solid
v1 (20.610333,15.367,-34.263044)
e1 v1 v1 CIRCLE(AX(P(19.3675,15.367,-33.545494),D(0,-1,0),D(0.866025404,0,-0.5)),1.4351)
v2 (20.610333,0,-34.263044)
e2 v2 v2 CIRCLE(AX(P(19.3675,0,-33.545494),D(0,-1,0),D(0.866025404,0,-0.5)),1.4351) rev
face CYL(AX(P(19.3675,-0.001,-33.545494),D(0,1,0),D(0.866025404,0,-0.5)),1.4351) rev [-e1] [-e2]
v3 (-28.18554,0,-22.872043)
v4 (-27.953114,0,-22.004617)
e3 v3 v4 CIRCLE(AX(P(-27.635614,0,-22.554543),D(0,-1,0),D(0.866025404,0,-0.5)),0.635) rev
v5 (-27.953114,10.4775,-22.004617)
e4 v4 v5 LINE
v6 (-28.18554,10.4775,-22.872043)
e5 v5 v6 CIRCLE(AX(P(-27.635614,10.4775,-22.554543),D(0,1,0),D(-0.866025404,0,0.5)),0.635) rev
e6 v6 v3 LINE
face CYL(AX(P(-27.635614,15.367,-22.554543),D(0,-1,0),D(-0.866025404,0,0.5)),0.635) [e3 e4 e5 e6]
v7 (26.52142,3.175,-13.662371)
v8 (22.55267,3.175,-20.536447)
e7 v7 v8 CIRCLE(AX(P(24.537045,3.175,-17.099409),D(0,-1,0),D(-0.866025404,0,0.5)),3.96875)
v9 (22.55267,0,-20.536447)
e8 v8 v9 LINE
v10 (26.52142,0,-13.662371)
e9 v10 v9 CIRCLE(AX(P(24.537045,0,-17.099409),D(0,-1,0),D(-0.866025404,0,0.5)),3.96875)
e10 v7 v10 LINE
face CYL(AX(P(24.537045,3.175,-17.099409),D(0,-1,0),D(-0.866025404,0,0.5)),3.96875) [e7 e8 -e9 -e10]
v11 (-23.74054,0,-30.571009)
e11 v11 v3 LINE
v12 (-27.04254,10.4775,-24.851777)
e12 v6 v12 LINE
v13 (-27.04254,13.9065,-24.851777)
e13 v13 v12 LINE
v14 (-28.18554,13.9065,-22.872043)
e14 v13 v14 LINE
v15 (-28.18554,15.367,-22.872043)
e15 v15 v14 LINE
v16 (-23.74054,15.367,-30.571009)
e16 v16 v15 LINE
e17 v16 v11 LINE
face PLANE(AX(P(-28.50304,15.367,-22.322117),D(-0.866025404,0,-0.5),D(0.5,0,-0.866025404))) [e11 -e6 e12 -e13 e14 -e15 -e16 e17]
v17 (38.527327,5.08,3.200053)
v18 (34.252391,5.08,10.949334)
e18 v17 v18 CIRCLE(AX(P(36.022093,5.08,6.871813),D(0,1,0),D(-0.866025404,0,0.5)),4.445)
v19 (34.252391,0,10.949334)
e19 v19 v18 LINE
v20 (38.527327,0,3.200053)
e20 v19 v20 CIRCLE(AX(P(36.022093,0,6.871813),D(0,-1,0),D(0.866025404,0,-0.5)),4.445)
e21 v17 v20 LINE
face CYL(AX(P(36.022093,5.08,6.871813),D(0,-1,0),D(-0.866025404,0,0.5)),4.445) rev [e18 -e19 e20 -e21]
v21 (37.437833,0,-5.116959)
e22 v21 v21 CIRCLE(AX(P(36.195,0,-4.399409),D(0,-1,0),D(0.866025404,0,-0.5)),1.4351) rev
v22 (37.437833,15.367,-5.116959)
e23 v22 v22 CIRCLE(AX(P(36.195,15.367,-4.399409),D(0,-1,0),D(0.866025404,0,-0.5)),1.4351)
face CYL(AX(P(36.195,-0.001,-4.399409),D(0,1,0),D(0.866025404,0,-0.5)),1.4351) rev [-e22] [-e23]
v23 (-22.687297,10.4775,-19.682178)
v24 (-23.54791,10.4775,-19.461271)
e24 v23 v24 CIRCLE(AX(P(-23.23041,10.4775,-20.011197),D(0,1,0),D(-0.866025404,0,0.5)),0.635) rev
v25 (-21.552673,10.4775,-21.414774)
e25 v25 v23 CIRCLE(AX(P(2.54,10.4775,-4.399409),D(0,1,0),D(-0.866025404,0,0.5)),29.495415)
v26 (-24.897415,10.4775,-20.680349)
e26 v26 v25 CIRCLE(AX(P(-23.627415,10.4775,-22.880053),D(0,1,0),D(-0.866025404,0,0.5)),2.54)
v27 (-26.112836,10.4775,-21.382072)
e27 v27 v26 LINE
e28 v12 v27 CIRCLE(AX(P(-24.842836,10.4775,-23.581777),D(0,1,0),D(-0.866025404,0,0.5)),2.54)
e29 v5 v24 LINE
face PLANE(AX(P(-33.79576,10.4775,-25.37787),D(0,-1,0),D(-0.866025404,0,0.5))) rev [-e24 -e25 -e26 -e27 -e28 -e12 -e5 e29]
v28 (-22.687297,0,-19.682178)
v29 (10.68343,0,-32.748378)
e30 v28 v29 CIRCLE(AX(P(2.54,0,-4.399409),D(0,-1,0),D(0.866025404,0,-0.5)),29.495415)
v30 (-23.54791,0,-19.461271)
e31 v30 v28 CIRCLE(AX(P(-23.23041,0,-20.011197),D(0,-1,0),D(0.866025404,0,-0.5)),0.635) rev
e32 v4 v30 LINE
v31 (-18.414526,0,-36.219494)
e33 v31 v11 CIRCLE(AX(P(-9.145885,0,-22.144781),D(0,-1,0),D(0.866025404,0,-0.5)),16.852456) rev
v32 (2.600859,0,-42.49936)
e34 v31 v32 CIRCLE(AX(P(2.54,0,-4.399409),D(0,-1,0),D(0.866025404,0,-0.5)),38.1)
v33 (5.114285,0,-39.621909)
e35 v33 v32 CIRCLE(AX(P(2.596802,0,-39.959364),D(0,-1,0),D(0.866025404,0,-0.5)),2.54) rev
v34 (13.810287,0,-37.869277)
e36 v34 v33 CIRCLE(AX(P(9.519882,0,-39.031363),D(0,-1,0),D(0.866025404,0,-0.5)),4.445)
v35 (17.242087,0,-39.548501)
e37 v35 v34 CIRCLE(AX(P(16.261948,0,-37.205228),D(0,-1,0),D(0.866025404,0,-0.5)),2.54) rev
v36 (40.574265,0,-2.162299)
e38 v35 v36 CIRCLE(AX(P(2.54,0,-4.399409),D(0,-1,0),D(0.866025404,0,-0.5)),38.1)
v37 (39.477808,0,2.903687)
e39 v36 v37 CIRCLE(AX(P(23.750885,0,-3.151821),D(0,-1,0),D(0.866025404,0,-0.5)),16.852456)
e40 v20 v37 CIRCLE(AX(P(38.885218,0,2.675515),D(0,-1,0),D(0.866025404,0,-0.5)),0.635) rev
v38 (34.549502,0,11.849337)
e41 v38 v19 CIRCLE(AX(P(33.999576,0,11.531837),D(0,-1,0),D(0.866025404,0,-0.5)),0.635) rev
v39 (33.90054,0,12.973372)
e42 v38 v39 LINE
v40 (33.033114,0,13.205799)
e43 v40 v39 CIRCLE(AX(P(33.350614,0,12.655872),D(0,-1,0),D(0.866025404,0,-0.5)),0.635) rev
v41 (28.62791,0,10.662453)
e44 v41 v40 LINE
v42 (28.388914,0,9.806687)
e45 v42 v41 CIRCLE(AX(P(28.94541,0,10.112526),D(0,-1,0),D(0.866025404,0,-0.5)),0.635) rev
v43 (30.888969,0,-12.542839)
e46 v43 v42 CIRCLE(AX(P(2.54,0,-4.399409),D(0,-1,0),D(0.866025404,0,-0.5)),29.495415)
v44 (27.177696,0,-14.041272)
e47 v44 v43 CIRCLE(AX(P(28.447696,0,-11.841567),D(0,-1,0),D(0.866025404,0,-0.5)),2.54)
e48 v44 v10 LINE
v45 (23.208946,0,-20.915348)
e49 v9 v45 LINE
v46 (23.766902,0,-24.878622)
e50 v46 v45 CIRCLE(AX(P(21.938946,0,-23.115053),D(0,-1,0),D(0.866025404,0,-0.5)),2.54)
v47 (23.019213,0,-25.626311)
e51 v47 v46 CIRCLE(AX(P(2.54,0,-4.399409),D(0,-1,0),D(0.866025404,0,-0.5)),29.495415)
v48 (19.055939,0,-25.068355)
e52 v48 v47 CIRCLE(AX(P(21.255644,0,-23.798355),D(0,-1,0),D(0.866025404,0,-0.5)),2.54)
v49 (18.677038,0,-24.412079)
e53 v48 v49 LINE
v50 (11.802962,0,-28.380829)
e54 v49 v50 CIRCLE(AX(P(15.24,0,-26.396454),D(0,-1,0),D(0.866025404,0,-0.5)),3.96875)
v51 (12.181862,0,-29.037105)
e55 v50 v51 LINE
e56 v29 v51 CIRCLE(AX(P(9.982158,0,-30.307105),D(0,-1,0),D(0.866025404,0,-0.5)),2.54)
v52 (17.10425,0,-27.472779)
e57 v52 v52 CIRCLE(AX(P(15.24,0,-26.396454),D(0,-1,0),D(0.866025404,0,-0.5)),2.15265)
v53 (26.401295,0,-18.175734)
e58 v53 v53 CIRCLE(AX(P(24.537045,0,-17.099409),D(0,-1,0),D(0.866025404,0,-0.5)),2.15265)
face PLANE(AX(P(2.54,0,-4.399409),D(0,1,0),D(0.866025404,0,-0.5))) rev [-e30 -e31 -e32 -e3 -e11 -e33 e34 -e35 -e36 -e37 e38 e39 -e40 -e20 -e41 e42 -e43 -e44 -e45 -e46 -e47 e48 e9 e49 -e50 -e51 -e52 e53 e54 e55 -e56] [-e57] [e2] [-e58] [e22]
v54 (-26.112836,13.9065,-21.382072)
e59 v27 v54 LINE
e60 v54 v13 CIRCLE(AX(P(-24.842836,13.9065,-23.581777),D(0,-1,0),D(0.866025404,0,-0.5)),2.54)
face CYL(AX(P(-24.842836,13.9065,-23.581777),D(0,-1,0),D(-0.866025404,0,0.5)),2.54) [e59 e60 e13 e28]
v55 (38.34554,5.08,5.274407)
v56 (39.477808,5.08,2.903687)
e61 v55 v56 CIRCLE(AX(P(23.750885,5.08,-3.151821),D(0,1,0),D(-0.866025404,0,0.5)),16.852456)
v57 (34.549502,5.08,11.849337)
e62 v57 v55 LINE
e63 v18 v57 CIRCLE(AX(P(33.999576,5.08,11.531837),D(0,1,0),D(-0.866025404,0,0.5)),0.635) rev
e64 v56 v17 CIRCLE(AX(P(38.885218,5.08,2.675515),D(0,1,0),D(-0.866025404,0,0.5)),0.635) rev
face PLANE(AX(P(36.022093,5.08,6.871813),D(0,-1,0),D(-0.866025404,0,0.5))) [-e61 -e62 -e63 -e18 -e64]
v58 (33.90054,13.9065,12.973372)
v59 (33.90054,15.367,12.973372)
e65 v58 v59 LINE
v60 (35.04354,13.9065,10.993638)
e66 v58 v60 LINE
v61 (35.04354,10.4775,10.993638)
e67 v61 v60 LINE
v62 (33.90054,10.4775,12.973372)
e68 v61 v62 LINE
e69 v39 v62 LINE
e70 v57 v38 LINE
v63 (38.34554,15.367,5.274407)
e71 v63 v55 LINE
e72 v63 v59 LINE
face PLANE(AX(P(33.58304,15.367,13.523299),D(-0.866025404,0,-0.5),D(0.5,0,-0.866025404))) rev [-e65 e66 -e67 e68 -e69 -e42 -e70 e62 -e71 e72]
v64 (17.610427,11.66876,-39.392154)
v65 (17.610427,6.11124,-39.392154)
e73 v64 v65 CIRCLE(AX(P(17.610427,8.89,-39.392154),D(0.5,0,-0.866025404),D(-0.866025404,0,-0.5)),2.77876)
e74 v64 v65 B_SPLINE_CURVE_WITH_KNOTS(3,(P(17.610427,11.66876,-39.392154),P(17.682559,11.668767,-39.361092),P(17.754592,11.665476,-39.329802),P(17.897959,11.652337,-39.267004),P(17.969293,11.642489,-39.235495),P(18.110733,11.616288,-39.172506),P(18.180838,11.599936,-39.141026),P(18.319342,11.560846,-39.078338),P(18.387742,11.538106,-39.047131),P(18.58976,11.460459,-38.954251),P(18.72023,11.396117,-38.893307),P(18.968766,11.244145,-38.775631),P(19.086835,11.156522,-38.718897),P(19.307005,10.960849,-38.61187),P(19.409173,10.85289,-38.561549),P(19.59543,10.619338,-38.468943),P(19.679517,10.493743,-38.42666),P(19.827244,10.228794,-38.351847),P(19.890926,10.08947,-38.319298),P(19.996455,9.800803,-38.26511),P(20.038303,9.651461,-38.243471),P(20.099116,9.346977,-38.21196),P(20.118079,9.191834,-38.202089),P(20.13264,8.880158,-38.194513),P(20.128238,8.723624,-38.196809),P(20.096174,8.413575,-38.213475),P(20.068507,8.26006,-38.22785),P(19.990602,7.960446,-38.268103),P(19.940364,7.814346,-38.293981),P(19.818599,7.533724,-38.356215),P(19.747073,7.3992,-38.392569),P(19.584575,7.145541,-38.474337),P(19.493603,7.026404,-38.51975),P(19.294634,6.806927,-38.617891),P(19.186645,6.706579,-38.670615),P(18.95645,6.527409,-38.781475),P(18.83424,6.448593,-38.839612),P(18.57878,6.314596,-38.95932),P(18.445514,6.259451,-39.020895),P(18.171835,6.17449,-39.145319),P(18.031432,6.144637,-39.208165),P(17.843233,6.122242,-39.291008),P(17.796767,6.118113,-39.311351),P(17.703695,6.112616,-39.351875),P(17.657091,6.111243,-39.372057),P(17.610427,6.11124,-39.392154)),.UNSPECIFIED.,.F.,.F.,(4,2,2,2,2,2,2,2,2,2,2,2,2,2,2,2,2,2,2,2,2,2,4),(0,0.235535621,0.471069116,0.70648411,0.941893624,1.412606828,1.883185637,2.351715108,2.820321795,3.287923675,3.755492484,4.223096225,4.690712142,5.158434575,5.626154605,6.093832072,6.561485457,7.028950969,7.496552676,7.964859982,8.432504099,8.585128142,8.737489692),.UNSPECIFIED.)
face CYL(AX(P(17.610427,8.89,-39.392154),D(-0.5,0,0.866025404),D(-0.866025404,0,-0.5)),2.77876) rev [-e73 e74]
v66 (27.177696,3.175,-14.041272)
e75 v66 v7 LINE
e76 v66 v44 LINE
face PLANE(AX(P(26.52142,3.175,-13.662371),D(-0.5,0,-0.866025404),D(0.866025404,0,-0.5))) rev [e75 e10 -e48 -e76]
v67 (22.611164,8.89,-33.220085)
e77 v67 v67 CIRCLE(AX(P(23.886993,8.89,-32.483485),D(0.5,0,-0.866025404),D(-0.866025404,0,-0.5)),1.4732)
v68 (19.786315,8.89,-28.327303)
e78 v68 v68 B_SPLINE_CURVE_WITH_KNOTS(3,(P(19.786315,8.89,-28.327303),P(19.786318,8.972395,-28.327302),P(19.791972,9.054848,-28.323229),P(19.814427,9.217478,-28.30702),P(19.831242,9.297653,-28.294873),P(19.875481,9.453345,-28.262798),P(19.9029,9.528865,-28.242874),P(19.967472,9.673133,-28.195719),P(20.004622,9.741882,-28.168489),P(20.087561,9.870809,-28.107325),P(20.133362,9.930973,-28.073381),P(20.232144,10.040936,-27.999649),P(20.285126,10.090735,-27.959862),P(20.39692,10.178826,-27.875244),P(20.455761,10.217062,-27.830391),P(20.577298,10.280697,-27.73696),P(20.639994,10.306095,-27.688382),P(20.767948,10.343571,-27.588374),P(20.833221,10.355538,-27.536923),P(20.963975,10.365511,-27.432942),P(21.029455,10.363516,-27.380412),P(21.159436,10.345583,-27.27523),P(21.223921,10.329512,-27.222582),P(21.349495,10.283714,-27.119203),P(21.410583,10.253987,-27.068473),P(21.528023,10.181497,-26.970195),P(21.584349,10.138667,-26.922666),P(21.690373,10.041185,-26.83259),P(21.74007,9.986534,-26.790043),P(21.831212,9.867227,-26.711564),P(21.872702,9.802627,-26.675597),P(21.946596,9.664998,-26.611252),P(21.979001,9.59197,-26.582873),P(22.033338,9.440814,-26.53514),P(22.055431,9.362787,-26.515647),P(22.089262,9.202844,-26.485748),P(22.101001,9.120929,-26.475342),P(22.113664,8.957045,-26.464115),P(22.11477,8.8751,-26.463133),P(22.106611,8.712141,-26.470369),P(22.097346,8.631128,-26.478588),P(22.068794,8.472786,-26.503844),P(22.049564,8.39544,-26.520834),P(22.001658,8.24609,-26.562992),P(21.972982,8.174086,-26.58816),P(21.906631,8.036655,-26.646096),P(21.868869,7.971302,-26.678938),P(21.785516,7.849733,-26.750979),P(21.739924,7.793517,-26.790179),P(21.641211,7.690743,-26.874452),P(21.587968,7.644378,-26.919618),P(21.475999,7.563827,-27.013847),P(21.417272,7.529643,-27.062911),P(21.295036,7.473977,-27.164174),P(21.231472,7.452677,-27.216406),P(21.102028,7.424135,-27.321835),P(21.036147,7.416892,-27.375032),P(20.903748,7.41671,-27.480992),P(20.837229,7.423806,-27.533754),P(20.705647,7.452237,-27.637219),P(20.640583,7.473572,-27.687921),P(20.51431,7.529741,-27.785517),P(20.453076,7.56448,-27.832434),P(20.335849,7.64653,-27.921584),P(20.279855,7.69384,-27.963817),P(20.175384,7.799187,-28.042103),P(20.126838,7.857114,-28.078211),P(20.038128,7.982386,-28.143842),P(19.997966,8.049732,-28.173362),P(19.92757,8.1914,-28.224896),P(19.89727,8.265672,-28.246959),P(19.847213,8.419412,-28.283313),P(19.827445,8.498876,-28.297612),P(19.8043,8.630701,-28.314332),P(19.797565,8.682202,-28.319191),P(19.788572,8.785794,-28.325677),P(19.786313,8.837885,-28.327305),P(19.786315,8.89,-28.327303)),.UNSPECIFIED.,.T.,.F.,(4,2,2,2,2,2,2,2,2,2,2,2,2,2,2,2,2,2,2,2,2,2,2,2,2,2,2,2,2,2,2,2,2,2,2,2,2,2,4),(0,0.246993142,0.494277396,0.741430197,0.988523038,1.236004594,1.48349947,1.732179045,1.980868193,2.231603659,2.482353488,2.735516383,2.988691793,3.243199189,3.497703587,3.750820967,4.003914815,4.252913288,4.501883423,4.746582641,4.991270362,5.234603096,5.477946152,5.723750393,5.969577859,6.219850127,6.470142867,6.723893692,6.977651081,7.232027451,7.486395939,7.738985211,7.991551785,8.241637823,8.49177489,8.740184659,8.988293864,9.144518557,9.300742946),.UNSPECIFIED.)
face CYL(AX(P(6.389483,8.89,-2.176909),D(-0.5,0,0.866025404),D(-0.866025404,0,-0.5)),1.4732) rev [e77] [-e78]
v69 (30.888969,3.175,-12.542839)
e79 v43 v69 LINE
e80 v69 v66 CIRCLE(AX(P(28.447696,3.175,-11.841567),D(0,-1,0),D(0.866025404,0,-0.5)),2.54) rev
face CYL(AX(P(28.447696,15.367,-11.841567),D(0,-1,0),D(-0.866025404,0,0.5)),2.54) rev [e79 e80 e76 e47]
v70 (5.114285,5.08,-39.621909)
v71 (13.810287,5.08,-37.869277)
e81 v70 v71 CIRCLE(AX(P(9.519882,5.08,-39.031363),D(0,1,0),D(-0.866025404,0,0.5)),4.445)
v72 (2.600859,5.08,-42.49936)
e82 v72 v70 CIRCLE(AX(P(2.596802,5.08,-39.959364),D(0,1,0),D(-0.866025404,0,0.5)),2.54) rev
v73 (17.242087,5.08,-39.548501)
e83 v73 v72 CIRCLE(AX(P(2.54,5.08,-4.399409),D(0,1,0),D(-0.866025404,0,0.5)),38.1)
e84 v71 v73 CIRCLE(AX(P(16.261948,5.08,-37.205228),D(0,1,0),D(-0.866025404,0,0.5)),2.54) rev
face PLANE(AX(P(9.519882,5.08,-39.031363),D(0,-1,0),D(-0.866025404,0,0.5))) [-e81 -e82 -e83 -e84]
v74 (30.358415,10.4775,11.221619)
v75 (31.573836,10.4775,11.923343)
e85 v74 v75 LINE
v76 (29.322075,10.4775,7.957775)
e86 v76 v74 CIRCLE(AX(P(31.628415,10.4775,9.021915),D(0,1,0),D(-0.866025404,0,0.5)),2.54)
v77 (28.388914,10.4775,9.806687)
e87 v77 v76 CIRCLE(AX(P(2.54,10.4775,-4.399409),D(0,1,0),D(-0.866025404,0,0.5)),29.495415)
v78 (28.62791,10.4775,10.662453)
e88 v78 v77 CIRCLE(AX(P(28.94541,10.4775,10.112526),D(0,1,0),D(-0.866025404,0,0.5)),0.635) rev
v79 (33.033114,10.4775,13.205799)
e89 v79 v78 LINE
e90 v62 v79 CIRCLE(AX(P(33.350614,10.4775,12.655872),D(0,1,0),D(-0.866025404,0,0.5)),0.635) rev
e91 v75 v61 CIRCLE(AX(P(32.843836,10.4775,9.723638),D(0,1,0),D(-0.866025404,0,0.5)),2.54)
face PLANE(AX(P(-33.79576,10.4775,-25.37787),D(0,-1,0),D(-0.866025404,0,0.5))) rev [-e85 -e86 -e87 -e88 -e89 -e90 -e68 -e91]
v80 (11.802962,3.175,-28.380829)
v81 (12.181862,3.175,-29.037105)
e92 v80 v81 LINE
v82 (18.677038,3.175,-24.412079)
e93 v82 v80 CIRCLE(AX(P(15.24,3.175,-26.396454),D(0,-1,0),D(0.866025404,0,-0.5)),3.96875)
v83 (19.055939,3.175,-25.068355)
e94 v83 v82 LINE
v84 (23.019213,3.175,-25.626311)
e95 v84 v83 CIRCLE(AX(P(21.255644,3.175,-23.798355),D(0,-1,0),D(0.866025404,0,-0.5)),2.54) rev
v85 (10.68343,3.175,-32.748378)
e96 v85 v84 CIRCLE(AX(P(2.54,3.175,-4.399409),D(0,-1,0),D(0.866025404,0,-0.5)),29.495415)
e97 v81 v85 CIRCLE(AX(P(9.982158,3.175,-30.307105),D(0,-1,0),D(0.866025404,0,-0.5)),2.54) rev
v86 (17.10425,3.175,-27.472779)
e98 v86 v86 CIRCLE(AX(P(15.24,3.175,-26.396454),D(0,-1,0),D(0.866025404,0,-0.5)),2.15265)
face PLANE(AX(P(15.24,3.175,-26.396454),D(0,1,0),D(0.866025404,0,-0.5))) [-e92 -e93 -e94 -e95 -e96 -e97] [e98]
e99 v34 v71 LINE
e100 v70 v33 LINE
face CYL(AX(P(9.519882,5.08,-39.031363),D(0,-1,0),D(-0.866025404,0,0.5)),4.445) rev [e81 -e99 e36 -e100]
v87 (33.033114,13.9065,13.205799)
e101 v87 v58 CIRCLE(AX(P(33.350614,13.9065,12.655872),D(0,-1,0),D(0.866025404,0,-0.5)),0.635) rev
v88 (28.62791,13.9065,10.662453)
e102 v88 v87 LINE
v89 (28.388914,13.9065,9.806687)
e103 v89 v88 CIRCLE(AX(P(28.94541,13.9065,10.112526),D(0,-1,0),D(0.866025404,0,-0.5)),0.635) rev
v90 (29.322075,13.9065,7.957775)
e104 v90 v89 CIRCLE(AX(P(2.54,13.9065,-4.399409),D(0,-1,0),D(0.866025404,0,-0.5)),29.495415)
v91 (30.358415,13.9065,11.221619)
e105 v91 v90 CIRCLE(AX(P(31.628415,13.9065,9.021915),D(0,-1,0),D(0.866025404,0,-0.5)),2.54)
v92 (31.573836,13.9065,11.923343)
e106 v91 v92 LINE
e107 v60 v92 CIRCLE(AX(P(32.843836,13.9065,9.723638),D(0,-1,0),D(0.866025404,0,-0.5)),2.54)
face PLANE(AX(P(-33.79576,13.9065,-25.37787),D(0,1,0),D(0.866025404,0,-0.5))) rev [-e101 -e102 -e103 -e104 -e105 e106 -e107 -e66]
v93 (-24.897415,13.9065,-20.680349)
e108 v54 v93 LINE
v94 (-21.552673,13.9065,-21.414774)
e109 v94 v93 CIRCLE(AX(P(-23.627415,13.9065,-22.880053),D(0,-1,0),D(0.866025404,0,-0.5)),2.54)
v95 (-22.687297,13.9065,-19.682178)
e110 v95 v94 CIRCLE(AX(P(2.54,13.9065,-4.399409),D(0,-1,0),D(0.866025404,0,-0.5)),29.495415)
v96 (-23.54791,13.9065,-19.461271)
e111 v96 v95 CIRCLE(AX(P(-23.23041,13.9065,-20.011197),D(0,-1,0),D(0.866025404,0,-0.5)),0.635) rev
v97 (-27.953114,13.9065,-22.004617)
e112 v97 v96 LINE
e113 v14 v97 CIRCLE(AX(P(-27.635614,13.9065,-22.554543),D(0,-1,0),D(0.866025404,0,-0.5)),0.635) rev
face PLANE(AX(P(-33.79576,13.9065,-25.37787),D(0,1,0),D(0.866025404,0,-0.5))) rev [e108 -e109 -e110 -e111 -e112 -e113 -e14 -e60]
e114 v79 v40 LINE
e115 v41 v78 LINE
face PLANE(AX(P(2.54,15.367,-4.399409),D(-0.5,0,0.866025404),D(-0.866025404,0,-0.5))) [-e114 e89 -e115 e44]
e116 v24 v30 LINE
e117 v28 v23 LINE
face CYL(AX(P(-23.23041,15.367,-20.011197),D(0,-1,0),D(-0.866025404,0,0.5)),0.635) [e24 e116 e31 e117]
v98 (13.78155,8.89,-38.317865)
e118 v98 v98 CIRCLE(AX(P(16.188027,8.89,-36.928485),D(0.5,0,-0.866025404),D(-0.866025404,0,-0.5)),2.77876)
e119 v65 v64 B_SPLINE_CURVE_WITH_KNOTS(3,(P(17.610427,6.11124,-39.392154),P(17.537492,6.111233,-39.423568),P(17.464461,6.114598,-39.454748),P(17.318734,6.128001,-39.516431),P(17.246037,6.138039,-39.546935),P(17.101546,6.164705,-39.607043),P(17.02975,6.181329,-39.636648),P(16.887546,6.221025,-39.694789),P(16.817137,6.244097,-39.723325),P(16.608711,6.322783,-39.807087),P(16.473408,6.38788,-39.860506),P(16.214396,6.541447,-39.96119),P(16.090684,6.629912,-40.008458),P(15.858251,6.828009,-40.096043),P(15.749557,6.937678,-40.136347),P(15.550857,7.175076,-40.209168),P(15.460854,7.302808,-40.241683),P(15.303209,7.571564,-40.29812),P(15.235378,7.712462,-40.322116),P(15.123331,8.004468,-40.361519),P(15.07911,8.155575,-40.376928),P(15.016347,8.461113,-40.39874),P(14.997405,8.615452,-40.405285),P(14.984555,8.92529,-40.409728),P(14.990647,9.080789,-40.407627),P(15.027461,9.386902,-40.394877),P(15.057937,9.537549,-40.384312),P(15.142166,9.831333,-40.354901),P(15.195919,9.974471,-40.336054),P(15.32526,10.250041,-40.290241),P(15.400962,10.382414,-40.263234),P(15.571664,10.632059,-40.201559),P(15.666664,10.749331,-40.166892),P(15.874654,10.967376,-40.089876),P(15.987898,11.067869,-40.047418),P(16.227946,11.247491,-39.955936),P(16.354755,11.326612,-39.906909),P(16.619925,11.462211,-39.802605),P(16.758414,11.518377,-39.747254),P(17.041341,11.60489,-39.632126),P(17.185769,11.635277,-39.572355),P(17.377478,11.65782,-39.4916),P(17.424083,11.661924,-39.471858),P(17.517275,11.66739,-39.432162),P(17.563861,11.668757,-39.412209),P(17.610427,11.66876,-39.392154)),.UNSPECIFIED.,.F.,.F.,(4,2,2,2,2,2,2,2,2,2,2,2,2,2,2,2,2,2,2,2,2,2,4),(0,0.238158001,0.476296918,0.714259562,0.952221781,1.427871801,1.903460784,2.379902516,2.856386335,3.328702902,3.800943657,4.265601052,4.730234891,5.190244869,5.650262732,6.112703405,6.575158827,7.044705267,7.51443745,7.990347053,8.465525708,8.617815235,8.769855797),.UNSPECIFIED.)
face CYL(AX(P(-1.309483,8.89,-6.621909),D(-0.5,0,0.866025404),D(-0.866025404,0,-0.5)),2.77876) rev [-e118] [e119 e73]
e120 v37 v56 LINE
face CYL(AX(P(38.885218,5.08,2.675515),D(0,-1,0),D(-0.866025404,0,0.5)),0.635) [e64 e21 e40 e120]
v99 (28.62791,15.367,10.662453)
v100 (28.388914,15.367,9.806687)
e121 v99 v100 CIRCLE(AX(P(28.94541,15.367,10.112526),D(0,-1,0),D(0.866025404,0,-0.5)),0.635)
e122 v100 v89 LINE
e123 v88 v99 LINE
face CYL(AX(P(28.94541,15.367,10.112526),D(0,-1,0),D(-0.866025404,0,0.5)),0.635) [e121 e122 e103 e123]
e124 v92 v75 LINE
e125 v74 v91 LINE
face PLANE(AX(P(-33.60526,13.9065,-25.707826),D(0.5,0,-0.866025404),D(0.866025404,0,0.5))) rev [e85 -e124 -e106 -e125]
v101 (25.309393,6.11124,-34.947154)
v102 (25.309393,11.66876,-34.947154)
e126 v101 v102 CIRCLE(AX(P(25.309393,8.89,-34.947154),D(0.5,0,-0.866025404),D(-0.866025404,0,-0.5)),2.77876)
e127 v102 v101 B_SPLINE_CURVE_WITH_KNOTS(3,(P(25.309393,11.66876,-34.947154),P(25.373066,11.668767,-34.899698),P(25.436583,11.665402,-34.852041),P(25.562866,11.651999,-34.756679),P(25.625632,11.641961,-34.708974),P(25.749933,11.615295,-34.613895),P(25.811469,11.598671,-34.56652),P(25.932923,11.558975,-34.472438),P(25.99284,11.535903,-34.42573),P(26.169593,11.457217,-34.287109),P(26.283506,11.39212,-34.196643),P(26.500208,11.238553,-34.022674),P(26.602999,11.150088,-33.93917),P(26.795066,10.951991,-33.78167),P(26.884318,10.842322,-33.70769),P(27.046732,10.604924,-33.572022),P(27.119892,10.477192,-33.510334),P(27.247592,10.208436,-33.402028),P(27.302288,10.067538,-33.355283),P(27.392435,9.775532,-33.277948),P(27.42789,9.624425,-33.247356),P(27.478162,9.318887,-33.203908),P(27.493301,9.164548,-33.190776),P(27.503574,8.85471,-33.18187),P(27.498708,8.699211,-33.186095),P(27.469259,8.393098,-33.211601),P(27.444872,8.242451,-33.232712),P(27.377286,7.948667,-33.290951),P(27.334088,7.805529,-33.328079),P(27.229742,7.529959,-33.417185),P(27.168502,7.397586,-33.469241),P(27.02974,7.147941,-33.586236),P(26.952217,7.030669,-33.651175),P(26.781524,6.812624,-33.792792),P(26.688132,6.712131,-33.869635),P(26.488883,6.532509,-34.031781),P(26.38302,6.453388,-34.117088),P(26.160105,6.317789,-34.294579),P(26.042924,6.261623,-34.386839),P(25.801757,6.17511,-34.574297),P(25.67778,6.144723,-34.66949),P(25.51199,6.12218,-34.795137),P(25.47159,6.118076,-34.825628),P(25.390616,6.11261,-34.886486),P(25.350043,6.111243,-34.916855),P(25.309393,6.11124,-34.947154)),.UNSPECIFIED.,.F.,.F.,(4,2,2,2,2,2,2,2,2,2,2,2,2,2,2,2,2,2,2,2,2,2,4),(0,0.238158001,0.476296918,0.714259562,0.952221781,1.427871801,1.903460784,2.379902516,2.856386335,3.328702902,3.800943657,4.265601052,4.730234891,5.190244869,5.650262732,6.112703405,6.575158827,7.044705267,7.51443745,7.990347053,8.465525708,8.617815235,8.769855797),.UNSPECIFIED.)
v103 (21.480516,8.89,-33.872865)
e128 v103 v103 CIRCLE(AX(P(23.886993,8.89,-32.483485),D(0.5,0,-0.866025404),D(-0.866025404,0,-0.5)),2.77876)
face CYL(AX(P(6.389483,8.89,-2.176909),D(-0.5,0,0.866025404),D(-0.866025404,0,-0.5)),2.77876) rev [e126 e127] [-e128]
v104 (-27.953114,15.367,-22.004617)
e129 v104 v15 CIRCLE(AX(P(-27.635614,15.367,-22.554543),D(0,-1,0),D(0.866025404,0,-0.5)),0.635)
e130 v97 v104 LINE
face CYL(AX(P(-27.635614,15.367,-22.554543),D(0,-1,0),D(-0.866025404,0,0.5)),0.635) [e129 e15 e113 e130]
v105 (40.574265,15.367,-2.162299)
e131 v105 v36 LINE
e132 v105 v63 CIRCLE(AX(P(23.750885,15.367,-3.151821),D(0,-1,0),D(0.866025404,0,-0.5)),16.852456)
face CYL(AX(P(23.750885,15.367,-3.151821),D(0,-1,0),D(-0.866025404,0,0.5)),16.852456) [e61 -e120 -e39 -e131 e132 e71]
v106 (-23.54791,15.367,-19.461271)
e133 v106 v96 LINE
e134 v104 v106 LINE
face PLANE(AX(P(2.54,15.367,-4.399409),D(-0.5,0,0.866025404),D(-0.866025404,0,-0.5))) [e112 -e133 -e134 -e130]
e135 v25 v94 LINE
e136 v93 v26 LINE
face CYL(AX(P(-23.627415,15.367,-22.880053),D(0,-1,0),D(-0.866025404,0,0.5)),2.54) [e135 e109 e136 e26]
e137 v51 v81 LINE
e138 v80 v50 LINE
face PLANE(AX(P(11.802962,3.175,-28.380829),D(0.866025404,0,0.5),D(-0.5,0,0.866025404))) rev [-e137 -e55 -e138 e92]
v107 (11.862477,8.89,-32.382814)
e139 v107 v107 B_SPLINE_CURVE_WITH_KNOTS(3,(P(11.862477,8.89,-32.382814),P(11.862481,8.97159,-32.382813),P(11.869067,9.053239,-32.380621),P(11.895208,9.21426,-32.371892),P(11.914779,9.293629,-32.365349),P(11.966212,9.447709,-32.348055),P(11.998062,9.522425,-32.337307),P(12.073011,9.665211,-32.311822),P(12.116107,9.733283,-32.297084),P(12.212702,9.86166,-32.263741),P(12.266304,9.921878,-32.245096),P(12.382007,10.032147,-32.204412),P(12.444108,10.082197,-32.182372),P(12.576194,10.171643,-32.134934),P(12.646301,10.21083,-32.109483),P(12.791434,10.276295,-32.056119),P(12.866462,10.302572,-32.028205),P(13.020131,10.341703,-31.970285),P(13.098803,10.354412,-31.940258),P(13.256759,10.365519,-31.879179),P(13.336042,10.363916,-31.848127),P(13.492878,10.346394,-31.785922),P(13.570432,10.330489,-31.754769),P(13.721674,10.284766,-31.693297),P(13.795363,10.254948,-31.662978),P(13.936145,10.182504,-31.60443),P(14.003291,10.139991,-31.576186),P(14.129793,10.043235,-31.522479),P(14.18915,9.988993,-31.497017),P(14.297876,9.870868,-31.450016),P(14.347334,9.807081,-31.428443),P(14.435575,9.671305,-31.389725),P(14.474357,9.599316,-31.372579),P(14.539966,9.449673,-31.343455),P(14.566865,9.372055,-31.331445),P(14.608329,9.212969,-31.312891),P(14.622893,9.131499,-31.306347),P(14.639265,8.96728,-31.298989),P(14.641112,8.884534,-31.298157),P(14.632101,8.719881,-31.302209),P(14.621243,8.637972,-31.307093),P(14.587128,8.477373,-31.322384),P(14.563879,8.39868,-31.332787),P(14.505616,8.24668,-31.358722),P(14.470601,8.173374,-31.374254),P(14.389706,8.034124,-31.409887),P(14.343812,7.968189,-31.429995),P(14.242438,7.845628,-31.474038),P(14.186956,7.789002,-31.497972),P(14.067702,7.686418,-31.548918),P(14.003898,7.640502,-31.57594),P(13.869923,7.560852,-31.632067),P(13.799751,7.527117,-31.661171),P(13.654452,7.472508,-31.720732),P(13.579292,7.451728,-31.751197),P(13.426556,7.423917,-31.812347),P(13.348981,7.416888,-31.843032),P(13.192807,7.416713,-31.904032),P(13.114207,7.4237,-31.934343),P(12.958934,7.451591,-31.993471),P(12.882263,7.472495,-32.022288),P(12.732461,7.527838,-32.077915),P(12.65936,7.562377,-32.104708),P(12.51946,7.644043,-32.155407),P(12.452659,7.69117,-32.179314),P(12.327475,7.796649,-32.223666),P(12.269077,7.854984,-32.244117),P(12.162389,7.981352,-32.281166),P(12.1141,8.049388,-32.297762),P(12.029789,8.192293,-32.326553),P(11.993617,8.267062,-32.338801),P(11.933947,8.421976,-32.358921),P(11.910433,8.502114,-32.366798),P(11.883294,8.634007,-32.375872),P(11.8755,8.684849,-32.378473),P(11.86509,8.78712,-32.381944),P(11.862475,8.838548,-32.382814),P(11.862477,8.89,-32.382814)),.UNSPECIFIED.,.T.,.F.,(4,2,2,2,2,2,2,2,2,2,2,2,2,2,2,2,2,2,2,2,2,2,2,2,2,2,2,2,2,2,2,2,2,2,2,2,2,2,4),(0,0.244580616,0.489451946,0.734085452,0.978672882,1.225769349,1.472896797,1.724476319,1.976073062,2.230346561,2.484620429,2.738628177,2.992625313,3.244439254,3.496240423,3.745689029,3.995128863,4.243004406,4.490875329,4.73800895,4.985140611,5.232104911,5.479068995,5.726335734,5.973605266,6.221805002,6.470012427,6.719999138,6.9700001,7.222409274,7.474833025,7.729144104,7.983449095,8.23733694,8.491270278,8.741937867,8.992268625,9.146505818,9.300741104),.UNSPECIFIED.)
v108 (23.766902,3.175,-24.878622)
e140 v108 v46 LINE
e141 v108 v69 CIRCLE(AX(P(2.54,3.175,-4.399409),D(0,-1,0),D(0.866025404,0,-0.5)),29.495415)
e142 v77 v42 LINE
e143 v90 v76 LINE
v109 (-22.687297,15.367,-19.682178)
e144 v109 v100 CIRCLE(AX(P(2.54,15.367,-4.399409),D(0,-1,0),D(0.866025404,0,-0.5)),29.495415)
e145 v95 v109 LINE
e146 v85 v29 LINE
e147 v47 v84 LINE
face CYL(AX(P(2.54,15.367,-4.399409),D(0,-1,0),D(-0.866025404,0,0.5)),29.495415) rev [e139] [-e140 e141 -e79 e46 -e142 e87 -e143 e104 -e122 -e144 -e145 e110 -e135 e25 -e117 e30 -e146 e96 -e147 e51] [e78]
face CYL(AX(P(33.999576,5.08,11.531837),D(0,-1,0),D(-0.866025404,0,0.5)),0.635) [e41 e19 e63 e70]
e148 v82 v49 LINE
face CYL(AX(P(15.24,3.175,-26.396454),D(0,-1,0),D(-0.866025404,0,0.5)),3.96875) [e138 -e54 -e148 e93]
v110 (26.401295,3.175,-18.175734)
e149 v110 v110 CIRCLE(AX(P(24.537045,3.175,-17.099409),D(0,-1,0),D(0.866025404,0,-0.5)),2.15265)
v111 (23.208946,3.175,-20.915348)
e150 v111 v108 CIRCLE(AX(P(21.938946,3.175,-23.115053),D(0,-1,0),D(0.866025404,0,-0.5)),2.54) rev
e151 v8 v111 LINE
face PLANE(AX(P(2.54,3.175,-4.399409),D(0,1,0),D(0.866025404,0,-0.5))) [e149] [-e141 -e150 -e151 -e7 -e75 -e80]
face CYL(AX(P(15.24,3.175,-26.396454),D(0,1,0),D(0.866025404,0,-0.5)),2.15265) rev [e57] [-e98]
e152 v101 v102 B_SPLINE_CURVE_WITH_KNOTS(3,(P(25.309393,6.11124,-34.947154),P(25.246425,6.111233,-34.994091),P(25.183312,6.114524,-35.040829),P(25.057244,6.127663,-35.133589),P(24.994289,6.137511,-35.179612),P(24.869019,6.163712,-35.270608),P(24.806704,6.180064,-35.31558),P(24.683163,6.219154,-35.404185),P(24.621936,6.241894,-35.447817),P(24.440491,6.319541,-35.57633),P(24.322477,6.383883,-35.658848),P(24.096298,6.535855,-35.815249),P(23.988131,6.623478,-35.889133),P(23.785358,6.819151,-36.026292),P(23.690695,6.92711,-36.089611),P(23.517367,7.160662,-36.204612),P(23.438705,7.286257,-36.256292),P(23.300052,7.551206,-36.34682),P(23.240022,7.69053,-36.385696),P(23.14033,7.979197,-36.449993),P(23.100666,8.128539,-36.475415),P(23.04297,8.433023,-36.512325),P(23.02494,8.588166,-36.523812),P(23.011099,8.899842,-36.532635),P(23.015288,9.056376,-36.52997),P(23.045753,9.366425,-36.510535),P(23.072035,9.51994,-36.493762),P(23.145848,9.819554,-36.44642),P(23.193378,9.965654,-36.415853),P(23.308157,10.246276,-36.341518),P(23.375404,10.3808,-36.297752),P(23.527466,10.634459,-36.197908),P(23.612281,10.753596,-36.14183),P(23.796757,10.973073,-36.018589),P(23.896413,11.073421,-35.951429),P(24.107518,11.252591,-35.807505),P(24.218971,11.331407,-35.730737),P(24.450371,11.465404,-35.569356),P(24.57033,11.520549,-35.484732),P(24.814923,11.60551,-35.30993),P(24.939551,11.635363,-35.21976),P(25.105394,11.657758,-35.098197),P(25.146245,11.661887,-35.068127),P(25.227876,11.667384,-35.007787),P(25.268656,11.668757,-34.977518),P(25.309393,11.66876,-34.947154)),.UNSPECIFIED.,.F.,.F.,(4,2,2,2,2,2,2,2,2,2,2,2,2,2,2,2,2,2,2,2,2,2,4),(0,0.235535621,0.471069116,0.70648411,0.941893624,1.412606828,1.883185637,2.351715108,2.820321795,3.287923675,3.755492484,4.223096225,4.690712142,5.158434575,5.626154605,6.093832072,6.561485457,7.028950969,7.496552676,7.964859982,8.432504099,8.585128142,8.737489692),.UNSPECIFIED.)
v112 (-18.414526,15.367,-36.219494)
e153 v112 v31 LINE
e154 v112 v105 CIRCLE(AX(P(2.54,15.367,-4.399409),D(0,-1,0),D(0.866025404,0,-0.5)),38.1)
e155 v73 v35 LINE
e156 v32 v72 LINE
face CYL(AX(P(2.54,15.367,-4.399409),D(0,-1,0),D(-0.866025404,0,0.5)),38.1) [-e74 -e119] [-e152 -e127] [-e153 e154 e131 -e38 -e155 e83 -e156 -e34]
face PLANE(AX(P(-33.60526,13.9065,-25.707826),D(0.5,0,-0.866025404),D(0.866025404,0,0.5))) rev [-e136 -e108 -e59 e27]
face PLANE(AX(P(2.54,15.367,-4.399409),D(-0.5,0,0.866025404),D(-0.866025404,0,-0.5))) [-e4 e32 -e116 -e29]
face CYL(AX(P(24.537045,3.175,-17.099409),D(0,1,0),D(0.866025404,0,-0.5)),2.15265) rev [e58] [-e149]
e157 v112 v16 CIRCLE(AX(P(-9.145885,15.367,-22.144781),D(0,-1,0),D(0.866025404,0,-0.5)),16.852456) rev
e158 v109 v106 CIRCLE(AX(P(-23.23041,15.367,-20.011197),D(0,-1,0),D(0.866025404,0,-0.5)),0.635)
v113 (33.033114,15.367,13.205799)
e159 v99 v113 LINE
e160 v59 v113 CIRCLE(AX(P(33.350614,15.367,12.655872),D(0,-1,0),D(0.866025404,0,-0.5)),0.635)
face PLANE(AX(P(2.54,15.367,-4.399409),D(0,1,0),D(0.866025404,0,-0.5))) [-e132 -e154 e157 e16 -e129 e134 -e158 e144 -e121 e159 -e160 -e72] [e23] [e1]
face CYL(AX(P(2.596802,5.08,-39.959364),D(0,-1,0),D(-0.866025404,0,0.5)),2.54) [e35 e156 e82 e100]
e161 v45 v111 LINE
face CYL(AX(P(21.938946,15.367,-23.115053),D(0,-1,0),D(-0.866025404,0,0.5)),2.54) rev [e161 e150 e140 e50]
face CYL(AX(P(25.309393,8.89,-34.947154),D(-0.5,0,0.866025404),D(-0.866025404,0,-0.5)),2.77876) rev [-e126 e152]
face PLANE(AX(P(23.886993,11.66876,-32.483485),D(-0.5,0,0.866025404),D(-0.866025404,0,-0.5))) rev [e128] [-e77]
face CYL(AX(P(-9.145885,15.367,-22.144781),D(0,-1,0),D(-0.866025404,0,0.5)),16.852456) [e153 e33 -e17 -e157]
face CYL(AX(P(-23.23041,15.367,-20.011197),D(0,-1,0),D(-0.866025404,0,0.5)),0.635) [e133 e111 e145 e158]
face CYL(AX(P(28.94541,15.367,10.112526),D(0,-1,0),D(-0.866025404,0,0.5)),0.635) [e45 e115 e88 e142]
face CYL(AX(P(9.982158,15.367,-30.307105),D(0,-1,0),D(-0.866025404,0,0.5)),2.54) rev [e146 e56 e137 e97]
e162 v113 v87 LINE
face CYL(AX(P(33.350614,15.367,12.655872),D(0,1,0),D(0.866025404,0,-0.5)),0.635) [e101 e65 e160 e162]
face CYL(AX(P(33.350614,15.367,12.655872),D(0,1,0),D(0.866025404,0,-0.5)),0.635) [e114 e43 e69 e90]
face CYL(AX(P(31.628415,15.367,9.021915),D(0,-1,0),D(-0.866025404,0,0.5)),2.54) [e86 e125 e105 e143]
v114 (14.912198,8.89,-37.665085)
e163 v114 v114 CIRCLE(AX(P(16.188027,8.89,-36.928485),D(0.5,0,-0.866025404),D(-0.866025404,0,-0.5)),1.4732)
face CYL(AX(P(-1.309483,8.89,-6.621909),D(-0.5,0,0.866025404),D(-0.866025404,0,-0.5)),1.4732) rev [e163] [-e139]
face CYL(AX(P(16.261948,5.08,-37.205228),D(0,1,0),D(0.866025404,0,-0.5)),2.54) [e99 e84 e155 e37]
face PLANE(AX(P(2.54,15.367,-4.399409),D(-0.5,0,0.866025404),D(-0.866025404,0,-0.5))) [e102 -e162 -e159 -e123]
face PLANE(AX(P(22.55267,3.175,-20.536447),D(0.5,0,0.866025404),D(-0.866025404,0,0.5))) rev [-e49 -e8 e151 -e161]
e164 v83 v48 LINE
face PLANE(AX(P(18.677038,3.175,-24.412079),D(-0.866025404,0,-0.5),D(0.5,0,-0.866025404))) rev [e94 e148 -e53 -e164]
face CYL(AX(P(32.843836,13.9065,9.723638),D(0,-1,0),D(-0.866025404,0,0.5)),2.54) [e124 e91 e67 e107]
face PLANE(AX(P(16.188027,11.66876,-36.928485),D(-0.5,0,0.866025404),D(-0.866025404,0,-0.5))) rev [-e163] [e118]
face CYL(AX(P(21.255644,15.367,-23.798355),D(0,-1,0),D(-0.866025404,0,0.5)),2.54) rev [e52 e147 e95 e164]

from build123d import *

# Parameters (mm, degrees)
BOSS_EXTRUDE1_DEPTH                        = 15.367
BOSS_EXTRUDE2_DEPTH                        = 3.175
F_8_CLEARANCE_HOLE1_D                      = 4.3053
SKETCH10_R                                 = 4.445
CUT_EXTRUDE2_DEPTH                         = 5.08
FILLET3_R                                  = 2.54
SKETCH12_W                                 = 0.381
SKETCH12_H                                 = 3.429
CUT_EXTRUDE5_DEPTH                         = 80.383868095
FILLET6_R                                  = 2.54
CBORE_START                                = -39
CBORE_FOR_4_SOCKET_HEAD_CAP_SCREW1_OUTL_R  = 2.77876
CBORE_FOR_4_SOCKET_HEAD_CAP_SCREW1_DEPTH   = 4.004980035
CBORE_START_2                              = -34.995019965
CBORE_FOR_4_SOCKET_HEAD_CAP_SCREW1_2_OU_R  = 1.4732
CBORE_FOR_4_SOCKET_HEAD_CAP_SCREW1_2_DEPTH = 6.995019965
CUT_EXTRUDE6_REACH                         = 58.03
SKETCH17_R                                 = 1.4351
FILLET7_R                                  = 0.635
CUT_EXTRUDE7_DEPTH                         = 61.777907815


with BuildPart() as part:
    # Sketch1 → Boss-Extrude1 (new body)
    with BuildSketch(Plane(origin=(0, 0, 0), x_dir=(1, 0, 0), z_dir=(0, 1, 0))):
        with BuildLine():
            Line((-35.805540197, 9.673815643), (-31.043040197, 17.922707614))
            Line((-31.043040197, 17.922707614), (-25.543778883, 14.747707614))
            ThreePointArc((-25.543778883, 14.747707614), (-14.747707614, -25.543778883), (25.543778883, -14.747707614))
            Line((25.543778883, -14.747707614), (31.043040197, -17.922707614))
            Line((31.043040197, -17.922707614), (26.280540197, -26.171599585))
            ThreePointArc((26.280540197, -26.171599585), (23.947229931, -29.306716595), (20.954526486, -31.820085162))
            ThreePointArc((20.954526486, -31.820085162), (-19.05, -32.995567884), (-38.034265344, 2.23710968))
            ThreePointArc((-38.034265344, 2.23710968), (-37.353976038, 6.085551173), (-35.805540197, 9.673815643))
        make_face()
    extrude(amount=BOSS_EXTRUDE1_DEPTH)

    # Sketch8 → Boss-Extrude2 (add)
    with BuildSketch(Plane(origin=(0, 0, 0), x_dir=(1, 0, 0), z_dir=(0, 1, 0))):
        with BuildLine():
            Line((-9.262961679, -23.981420256), (-11.176555889, -27.295862653))
            ThreePointArc((-11.176555889, -27.295862653), (-14.747707614, -25.543778883), (-18.050632531, -23.327112653))
            Line((-18.050632531, -23.327112653), (-16.137038321, -20.012670256))
            ThreePointArc((-16.137038321, -20.012670256), (-10.715625, -18.560006935), (-9.262961679, -23.981420256))
        make_face()
        with BuildLine():
            Line((3.96875, -25.4), (3.96875, -29.22718842))
            ThreePointArc((3.96875, -29.22718842), (0, -29.495415229), (-3.96875, -29.22718842))
            Line((-3.96875, -29.22718842), (-3.96875, -25.4))
            ThreePointArc((-3.96875, -25.4), (0, -21.43125), (3.96875, -25.4))
        make_face()
    extrude(amount=BOSS_EXTRUDE2_DEPTH)

    # #8 Clearance Hole1 (through all)
    with Locations(Plane(origin=(0, 3.175, 0), x_dir=(1, 0, 0), z_dir=(0, 1, 0))):
        with Locations((0, -25.4), (-12.7, -21.997045256)):
            Hole(F_8_CLEARANCE_HOLE1_D / 2)

    # Sketch10 → Cut-Extrude2 (cut)
    with BuildSketch(Plane.XZ):
        with Locations((-26.502210802, 23.360731753)):
            Circle(SKETCH10_R)
        with Locations((26.502210802, 23.360731753)):
            Circle(SKETCH10_R)
    extrude(amount=-CUT_EXTRUDE2_DEPTH, mode=Mode.SUBTRACT)

    # Fillet3
    fillet3_edges = [part.edges().sort_by_distance(p)[0] for p in [
        (-18.050632531, 1.5875, 23.327112653),
        (-11.176555889, 1.5875, 27.295862653),
        (-3.96875, 1.5875, 29.22718842),
        (3.96875, 1.5875, 29.22718842),
        (-30.836833913, 2.54, 22.376319497),
        (-26.069605371, 2.54, 27.784630208),
    ]]
    fillet(fillet3_edges, radius=FILLET3_R)

    # Sketch12 → Cut-Extrude5 (cut, through all)
    with BuildSketch(Plane(origin=(31.043040197, 0, 17.922707614), x_dir=(0.5000000000000004, 0, -0.8660254037844384), z_dir=(0.8660254037844384, 0, 0.5000000000000004))):
        with Locations((-0.1905, 12.192)):
            Rectangle(SKETCH12_W, SKETCH12_H)
    extrude(amount=-CUT_EXTRUDE5_DEPTH, mode=Mode.SUBTRACT)

    # Fillet6
    fillet6_edges = [part.edges().sort_by_distance(p)[0] for p in [
        (-25.732147733, 12.192, -14.416521515),
        (25.351147733, 12.192, 15.076432873),
        (-31.233540197, 12.192, -17.592751936),
        (30.852540197, 12.192, 18.252663293),
    ]]
    fillet(fillet6_edges, radius=FILLET6_R)

    # CBORE for #4 Socket Head Cap Screw1: read off the stored shape, not the designer's step
    # CBORE for #4 Socket Head Cap Screw1 outl → CBORE for #4 Socket Head Cap Screw1 (cut)
    with BuildSketch(Plane(origin=(0, 0, 0), x_dir=(0.8660254037844374, 0, 0.5000000000000022), z_dir=(0.5000000000000022, 0, -0.8660254037844374)).offset(CBORE_START)):
        with Locations((4.445, -8.89)):
            Circle(CBORE_FOR_4_SOCKET_HEAD_CAP_SCREW1_OUTL_R)
        with Locations((-4.445, -8.89)):
            Circle(CBORE_FOR_4_SOCKET_HEAD_CAP_SCREW1_OUTL_R)
    extrude(amount=CBORE_FOR_4_SOCKET_HEAD_CAP_SCREW1_DEPTH, mode=Mode.SUBTRACT)

    # CBORE for _4 Socket Head Cap Screw1 2 ou → CBORE for _4 Socket Head Cap Screw1 2 (cut)
    with BuildSketch(Plane(origin=(0, 0, 0), x_dir=(0.8660254037844374, 0, 0.5000000000000022), z_dir=(0.5000000000000022, 0, -0.8660254037844374)).offset(CBORE_START_2)):
        with Locations((4.445, -8.89)):
            Circle(CBORE_FOR_4_SOCKET_HEAD_CAP_SCREW1_2_OU_R)
        with Locations((-4.445, -8.89)):
            Circle(CBORE_FOR_4_SOCKET_HEAD_CAP_SCREW1_2_OU_R)
    extrude(amount=CBORE_FOR_4_SOCKET_HEAD_CAP_SCREW1_2_DEPTH, mode=Mode.SUBTRACT)

    # Sketch17 → Cut-Extrude6 (cut, up to next)
    with BuildSketch(Plane(origin=(0, 15.367, 0), x_dir=(1, 0, 0), z_dir=(0, 1, 0)), mode=Mode.PRIVATE) as cut_extrude6_sk1:
        with Locations(Location((-16.8275, -29.146084964, 0), (0, 0, 270))):
            Circle(SKETCH17_R)
    cut_extrude6_tool1 = extrude(cut_extrude6_sk1.sketch, amount=-CUT_EXTRUDE6_REACH, mode=Mode.PRIVATE) & part.part
    # Sketch17 → Cut-Extrude6 (cut, up to next)
    with BuildSketch(Plane(origin=(0, 15.367, 0), x_dir=(1, 0, 0), z_dir=(0, 1, 0)), mode=Mode.PRIVATE) as cut_extrude6_sk2:
        with Locations(Location((16.8275, -29.146084964, 0), (0, 0, 270))):
            Circle(SKETCH17_R)
    cut_extrude6_tool2 = extrude(cut_extrude6_sk2.sketch, amount=-CUT_EXTRUDE6_REACH, mode=Mode.PRIVATE) & part.part
    add(cut_extrude6_tool1.solids().sort_by_distance((-16.8275, 15.367, 29.146085))[0], mode=Mode.SUBTRACT)
    add(cut_extrude6_tool2.solids().sort_by_distance((16.8275, 15.367, 29.146085))[0], mode=Mode.SUBTRACT)

    # Fillet7
    fillet7_edges = [part.edges().sort_by_distance(p)[0] for p in [
        (25.543778883, 5.23875, 14.747707614),
        (31.043040197, 5.23875, 17.922707614),
        (25.543778883, 14.63675, 14.747707614),
        (31.043040197, 14.63675, 17.922707614),
        (-31.043040197, 5.23875, -17.922707614),
        (-25.543778883, 5.23875, -14.747707614),
        (-31.043040197, 14.63675, -17.922707614),
        (-25.543778883, 14.63675, -14.747707614),
        (25.323084778, 2.54, 27.646485691),
        (29.691178841, 2.54, 20.264200169),
    ]]
    fillet(fillet7_edges, radius=FILLET7_R)


with BuildPart() as body_2:
    # Mirror4: mirrored copy
    add(part.part.mirror(Plane(origin=(1.27, 0, -2.199704526), x_dir=(0.8660254037844389, 0, 0.49999999999999944), z_dir=(0.49999999999999967, 0, -0.8660254037844389))))


with BuildPart() as part_1:
    add(part.part)

    # Sketch18 → Cut-Extrude7 (cut, through all)
    with BuildSketch(Plane(origin=(0, 15.367, 0), x_dir=(1, 0, 0), z_dir=(0, 1, 0))):
        Polygon((-35.598010153, 20.561277362), (38.427739113, -19.56618359), (10.396462238, -40.426668706), (-26.181818955, -37.529379107), (-44.652040151, -8.121889672), align=None)
    extrude(amount=-CUT_EXTRUDE7_DEPTH, mode=Mode.SUBTRACT)


solid = body_2.part
